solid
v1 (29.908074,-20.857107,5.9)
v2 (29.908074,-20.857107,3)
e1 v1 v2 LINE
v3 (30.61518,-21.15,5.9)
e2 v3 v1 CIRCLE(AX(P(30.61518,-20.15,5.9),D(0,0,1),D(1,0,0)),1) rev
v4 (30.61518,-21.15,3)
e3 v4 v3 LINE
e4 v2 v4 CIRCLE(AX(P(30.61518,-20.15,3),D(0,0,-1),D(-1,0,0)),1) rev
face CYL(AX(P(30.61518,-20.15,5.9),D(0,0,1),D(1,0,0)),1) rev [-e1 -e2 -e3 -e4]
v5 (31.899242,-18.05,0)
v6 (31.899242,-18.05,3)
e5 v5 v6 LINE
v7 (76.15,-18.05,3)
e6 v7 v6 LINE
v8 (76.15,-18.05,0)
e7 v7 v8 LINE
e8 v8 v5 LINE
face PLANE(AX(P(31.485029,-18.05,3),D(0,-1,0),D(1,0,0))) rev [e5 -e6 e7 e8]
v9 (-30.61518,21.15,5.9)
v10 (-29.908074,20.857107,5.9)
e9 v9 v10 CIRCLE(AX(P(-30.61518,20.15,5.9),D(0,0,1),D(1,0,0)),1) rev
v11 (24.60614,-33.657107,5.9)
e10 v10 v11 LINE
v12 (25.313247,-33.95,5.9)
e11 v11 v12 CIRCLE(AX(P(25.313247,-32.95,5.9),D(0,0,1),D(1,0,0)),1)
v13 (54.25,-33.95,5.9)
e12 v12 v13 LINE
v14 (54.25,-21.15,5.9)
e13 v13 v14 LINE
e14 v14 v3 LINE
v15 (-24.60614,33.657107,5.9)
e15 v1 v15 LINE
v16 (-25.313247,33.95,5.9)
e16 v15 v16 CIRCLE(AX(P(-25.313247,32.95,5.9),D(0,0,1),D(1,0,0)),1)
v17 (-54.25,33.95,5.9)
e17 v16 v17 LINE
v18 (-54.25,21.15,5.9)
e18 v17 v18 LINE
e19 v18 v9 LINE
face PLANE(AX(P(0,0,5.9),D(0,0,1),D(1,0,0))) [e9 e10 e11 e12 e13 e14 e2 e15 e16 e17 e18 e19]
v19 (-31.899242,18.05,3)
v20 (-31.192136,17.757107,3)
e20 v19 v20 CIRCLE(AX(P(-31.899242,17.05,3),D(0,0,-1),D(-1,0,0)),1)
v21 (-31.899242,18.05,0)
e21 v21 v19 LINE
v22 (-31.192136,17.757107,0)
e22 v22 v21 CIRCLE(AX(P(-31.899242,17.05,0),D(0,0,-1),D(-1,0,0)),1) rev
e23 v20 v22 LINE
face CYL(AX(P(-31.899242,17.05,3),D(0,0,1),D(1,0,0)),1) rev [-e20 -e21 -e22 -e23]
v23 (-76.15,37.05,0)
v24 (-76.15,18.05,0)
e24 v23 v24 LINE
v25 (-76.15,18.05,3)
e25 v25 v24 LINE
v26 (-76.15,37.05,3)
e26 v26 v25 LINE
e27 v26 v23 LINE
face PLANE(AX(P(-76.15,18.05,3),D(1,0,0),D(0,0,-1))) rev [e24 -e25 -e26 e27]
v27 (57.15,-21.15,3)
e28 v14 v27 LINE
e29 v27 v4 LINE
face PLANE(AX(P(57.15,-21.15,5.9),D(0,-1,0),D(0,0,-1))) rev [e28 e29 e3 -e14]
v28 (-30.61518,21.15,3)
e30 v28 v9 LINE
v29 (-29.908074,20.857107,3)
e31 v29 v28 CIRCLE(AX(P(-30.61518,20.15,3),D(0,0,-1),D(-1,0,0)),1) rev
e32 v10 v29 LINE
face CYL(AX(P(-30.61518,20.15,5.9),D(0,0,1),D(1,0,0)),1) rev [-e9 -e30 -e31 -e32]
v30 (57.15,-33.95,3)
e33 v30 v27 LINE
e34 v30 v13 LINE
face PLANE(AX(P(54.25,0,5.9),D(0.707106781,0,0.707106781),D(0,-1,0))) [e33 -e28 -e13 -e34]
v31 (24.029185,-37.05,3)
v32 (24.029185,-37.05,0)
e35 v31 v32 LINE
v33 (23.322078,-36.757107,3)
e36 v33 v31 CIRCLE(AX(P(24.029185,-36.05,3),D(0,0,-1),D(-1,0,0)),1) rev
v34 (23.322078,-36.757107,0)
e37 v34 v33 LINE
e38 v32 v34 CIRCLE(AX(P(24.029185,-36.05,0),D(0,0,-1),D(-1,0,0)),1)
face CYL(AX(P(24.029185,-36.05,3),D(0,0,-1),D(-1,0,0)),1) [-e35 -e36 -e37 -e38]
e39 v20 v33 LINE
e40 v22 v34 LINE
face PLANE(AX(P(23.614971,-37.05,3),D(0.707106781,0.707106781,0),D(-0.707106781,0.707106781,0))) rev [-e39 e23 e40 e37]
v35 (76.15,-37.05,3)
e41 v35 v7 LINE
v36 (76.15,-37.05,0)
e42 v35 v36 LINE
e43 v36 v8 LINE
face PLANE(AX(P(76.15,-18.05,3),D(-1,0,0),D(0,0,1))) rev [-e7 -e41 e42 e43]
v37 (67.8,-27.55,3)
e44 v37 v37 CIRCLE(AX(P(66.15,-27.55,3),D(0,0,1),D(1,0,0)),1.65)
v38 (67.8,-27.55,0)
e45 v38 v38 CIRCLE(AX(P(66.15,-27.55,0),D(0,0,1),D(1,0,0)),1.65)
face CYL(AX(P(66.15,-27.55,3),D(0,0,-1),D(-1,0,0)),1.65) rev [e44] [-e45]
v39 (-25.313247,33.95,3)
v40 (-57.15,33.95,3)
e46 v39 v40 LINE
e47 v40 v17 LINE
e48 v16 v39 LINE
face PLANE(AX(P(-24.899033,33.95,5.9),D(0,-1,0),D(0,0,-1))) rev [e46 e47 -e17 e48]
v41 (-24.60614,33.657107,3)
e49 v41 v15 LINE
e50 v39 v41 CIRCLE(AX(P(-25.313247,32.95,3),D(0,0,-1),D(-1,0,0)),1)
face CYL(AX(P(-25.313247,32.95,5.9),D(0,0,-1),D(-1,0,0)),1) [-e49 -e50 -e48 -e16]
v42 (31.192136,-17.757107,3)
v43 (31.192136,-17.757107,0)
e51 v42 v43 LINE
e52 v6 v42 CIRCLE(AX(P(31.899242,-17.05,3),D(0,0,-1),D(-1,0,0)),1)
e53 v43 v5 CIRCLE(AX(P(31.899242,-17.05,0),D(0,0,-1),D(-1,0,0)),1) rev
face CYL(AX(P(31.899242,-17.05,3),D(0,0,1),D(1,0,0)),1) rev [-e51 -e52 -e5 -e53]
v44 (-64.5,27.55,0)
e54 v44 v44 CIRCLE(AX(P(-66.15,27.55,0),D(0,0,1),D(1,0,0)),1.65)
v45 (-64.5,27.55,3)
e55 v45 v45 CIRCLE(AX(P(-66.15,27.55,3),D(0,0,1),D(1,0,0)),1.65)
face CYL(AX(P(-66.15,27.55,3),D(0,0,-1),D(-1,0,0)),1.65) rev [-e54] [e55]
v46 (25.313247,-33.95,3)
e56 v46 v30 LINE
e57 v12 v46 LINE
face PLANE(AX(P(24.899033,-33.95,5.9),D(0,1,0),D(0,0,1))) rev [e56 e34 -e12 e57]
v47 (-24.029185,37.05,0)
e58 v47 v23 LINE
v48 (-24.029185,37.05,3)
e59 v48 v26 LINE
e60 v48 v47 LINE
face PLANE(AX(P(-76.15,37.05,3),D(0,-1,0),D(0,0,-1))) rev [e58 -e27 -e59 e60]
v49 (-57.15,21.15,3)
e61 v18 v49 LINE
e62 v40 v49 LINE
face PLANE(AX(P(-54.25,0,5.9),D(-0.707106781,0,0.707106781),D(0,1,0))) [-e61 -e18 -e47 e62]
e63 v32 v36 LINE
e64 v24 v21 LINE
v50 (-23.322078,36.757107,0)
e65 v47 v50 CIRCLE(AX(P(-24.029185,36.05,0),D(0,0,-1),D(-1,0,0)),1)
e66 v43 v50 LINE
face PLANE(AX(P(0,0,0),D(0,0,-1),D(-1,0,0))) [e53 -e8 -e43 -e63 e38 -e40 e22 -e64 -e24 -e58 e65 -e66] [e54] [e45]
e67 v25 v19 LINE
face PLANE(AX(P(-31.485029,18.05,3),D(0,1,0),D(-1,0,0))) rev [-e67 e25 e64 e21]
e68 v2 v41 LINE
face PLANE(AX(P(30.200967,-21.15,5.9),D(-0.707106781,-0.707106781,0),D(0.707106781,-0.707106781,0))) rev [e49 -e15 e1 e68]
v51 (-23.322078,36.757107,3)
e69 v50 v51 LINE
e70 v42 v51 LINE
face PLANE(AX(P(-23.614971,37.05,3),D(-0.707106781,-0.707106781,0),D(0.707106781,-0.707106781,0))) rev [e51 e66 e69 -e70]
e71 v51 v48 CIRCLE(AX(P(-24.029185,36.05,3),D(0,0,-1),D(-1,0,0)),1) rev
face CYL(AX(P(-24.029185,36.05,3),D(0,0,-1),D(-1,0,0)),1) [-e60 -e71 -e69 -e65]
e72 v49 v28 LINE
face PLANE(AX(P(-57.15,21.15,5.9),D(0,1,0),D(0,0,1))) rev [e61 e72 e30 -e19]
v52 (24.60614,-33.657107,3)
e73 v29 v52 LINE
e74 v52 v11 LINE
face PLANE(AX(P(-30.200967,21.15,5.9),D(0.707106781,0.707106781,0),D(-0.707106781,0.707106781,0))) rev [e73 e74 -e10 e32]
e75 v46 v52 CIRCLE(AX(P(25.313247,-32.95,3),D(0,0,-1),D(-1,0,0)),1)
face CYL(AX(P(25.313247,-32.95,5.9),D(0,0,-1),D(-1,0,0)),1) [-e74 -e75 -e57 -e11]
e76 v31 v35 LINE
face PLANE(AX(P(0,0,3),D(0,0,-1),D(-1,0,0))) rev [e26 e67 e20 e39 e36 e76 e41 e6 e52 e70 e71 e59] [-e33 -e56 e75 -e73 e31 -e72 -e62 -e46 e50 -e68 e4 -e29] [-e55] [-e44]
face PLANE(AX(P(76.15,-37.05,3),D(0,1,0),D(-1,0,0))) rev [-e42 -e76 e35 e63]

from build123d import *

# Parameters (mm, degrees)
SKETCH_1_R      = 1.65
EXTRUDE_1_DEPTH = 3
EXTRUDE_2_DEPTH = 2.9
CHAMFER_1_SIZE  = 2.9
FILLET_1_R      = 1


with BuildPart() as part:
    # 草图1 → 凸台-拉伸1 (new body)
    with BuildSketch(Plane.XY):
        Polygon((-76.15, 37.05), (-23.614971157, 37.05), (31.485028843, -18.05), (76.15, -18.05), (76.15, -37.05), (23.614971157, -37.05), (-31.485028843, 18.05), (-76.15, 18.05), align=None)
        with Locations((-66.15, 27.55)):
            Circle(SKETCH_1_R, mode=Mode.SUBTRACT)
        with Locations((66.15, -27.55)):
            Circle(SKETCH_1_R, mode=Mode.SUBTRACT)
    extrude(amount=EXTRUDE_1_DEPTH)

    # 草图2 → 凸台-拉伸2 (add)
    with BuildSketch(Plane.XY.offset(3)):
        Polygon((-57.15, 33.95), (-57.15, 21.15), (-30.200966799, 21.15), (24.899033201, -33.95), (57.15, -33.95), (57.15, -21.15), (30.200966799, -21.15), (-24.899033201, 33.95), align=None)
    extrude(amount=EXTRUDE_2_DEPTH)

    # 倒角1
    chamfer_1_edges = [part.edges().sort_by_distance(p)[0] for p in [
        (57.15, -27.55, 5.9),
        (-57.15, 27.55, 5.9),
    ]]
    chamfer(chamfer_1_edges, length=CHAMFER_1_SIZE - 0.0001)  # a hair under: the kernel refuses the full size

    # 圆角1
    fillet_1_edges = [part.edges().sort_by_distance(p)[0] for p in [
        (-23.614971157, 37.05, 1.5),
        (31.485028843, -18.05, 1.5),
        (23.614971157, -37.05, 1.5),
        (-31.485028843, 18.05, 1.5),
        (-24.899033201, 33.95, 4.45),
        (-30.200966799, 21.15, 4.45),
        (24.899033201, -33.95, 4.45),
        (30.200966799, -21.15, 4.45),
    ]]
    fillet(fillet_1_edges, radius=FILLET_1_R)


solid = part.part
